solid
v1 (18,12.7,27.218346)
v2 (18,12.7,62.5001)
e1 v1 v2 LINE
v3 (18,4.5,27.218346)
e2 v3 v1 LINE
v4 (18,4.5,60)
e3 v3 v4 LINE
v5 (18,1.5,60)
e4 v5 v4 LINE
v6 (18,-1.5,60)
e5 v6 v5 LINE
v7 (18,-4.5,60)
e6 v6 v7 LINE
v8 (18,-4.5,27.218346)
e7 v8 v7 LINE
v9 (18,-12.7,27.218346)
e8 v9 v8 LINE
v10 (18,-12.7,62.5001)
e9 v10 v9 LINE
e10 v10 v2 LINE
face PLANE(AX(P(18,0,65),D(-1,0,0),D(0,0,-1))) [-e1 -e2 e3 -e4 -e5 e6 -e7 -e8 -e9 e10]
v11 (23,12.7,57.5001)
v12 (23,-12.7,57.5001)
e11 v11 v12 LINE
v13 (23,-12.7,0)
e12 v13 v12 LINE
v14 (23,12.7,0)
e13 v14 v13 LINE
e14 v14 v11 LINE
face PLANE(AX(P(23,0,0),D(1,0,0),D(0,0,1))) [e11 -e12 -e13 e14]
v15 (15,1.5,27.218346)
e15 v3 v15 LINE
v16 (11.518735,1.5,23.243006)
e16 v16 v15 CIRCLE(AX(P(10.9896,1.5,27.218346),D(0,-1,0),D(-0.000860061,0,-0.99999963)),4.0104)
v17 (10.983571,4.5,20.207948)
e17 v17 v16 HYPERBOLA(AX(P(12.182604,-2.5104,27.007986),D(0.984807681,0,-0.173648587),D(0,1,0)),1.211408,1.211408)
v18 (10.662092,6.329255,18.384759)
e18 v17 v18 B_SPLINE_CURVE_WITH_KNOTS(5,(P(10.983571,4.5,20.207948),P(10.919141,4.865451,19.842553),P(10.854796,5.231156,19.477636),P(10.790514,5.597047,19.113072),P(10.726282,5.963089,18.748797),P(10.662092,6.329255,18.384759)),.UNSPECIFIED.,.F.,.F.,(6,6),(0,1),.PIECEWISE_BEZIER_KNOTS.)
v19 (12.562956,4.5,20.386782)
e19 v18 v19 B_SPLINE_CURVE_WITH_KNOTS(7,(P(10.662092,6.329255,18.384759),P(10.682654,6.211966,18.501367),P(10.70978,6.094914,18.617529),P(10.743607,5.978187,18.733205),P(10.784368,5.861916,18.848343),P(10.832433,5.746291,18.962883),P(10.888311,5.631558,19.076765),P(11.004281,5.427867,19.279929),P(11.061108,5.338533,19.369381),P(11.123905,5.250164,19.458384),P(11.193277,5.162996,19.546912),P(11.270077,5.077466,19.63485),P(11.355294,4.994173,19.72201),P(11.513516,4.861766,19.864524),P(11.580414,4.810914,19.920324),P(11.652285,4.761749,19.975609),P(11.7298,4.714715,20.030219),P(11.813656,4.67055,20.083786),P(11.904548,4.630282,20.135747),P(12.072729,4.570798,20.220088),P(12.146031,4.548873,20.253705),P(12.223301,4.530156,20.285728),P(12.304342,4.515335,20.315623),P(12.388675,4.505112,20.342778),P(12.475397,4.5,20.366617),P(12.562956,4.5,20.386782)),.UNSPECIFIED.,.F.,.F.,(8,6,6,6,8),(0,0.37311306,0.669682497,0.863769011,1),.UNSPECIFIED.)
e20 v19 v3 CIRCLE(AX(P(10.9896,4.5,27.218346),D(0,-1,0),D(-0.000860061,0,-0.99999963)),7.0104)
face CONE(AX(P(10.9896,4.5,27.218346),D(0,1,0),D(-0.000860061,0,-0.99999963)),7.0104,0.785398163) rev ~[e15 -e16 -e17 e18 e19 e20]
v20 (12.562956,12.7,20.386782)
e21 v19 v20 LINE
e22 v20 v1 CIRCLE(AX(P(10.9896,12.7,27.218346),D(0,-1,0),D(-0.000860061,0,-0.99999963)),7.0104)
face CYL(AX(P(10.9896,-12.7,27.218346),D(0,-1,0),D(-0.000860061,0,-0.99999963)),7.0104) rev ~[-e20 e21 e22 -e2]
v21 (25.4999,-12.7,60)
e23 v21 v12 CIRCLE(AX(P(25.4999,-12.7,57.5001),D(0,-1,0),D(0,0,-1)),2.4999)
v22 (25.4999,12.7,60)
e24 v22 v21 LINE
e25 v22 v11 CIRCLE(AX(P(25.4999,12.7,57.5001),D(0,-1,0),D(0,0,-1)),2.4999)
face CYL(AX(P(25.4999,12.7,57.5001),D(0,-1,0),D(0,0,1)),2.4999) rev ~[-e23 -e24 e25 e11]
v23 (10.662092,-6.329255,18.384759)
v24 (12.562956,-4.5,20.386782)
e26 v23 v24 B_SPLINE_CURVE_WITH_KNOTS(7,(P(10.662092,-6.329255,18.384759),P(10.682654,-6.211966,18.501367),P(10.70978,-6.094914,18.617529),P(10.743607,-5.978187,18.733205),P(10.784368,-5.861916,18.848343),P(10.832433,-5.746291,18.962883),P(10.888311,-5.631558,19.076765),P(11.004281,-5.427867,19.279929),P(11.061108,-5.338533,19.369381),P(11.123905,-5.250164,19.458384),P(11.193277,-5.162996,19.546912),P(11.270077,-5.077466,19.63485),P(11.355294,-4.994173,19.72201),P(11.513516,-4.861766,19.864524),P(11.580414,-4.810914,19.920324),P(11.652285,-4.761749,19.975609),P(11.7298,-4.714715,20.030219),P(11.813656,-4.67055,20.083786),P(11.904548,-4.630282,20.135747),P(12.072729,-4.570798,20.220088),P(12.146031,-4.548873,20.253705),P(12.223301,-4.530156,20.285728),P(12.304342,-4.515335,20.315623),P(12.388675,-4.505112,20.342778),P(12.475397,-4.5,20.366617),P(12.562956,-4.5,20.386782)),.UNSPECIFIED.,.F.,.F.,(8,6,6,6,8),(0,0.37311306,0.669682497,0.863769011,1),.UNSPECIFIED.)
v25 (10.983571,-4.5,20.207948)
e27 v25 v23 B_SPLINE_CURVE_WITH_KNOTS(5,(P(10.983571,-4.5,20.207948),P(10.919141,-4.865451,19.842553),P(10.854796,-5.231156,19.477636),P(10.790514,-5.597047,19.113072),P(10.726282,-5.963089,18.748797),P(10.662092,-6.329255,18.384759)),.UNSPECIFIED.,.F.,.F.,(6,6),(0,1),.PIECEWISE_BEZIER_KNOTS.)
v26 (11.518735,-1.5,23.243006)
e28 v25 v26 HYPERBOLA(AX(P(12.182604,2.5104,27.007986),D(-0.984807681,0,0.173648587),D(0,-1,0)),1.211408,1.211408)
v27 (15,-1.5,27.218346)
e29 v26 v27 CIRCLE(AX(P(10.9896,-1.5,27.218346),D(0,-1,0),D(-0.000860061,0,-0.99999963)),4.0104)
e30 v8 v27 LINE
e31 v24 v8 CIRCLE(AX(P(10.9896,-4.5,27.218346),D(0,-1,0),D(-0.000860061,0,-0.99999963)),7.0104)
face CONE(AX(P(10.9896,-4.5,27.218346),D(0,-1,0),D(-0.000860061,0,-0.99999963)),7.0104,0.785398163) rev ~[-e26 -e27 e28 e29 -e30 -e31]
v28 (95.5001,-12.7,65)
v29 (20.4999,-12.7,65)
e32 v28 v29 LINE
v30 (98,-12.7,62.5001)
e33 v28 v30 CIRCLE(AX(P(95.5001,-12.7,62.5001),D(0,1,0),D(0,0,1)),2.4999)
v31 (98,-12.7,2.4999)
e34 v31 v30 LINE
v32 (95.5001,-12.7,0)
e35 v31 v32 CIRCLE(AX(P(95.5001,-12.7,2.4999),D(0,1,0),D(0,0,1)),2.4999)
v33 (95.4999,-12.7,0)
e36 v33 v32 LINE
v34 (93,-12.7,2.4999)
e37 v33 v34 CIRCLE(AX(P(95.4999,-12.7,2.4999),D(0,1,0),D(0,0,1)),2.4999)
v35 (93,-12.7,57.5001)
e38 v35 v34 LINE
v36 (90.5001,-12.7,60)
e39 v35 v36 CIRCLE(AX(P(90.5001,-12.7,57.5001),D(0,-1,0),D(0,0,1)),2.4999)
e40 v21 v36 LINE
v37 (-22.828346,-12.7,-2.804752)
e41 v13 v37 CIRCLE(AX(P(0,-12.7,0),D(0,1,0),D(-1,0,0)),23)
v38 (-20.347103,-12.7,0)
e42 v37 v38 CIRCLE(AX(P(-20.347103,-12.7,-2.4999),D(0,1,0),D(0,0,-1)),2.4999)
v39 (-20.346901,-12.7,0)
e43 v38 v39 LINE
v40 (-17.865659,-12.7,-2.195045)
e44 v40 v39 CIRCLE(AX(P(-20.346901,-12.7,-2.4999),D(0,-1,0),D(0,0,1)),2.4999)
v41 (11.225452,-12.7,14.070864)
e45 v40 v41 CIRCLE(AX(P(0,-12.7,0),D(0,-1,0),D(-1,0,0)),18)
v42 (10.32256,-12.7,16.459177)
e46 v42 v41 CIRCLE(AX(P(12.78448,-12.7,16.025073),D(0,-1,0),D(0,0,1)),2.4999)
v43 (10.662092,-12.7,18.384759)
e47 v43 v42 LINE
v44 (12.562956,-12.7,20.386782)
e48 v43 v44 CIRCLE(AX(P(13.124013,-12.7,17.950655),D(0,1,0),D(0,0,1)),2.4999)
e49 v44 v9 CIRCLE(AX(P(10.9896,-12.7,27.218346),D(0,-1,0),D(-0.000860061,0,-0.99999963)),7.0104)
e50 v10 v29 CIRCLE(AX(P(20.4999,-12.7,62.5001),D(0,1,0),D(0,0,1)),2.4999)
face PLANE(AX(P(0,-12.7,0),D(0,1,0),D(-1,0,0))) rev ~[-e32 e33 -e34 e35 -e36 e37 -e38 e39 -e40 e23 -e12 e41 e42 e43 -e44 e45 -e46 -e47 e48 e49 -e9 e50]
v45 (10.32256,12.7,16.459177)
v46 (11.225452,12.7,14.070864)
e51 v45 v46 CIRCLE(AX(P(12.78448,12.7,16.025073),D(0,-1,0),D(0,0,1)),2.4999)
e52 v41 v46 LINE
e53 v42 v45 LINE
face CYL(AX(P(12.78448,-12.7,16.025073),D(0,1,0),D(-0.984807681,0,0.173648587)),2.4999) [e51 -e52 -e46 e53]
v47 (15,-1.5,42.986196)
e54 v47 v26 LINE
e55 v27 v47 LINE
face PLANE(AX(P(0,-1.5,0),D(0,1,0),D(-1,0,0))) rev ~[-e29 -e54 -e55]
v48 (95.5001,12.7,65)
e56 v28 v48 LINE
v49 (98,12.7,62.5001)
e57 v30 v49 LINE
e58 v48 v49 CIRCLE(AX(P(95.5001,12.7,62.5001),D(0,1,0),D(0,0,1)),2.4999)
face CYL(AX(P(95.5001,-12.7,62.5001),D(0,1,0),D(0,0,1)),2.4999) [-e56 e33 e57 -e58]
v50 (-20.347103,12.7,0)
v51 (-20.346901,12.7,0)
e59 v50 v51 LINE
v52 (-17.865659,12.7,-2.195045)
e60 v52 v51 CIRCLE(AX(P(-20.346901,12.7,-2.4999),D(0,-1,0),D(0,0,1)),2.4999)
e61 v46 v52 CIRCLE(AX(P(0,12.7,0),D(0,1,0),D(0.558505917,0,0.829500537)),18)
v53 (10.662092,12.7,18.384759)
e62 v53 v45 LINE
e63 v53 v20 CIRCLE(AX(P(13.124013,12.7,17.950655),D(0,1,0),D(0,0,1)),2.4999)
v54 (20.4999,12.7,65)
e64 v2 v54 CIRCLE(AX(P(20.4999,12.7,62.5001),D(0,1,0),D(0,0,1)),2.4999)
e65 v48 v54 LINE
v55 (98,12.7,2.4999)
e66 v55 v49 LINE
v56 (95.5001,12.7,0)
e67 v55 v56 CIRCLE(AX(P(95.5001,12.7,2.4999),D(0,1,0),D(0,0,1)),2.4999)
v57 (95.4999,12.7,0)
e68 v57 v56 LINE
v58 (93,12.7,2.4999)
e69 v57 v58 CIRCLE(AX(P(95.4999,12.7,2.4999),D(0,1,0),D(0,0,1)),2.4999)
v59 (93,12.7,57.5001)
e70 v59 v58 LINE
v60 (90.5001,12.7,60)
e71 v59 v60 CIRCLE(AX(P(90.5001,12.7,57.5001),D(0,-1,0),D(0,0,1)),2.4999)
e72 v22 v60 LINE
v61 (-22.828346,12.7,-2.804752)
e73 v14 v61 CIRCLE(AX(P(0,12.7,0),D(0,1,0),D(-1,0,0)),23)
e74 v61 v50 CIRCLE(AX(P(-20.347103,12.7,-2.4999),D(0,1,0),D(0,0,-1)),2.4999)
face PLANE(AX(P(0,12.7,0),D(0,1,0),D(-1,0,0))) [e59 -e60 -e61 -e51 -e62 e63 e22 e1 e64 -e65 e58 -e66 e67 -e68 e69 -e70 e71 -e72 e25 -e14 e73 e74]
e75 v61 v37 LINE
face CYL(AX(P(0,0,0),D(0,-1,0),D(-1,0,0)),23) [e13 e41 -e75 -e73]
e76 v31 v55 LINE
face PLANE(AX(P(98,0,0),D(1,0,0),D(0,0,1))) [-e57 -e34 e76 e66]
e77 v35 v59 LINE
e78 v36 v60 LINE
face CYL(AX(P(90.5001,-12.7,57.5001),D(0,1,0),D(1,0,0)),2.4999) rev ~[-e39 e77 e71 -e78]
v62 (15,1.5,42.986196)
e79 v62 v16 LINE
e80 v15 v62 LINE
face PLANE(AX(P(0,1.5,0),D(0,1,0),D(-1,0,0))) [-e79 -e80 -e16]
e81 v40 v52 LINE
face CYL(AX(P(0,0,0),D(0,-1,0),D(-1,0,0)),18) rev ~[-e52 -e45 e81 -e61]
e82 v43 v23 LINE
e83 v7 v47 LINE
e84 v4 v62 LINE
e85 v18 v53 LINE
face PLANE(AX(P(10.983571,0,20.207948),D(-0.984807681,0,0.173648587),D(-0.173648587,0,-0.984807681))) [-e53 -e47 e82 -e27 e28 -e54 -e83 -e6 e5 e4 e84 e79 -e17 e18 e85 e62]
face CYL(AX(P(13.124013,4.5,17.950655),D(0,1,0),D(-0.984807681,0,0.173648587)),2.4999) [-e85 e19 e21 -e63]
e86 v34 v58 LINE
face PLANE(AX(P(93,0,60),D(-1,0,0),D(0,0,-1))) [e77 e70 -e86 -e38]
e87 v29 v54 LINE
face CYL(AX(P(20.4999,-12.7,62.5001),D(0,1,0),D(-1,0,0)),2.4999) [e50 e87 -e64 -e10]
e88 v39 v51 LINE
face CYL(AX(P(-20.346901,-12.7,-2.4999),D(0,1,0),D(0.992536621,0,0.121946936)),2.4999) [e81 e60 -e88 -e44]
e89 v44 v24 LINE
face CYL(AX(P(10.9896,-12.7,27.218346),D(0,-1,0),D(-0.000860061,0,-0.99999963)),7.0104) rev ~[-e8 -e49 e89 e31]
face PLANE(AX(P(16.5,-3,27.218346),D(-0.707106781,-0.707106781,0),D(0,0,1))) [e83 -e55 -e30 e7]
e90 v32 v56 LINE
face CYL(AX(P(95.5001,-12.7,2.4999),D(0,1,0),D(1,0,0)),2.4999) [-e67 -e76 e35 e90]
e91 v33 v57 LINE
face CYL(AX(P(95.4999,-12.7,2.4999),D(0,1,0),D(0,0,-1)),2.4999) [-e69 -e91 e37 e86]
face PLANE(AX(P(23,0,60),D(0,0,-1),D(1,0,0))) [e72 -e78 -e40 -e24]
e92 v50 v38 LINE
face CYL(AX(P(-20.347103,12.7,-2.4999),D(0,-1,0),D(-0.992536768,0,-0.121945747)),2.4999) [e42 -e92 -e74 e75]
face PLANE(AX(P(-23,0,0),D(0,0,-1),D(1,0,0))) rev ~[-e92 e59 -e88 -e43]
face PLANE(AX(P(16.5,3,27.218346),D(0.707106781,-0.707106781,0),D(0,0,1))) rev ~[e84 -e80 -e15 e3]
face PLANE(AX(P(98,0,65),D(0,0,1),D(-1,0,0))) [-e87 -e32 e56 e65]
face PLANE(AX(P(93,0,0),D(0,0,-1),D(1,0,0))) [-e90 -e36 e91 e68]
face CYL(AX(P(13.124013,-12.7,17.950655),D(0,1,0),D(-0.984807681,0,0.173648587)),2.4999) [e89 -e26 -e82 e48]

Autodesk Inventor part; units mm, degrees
ref_plane "YZ Plane" through (0, 0, 0) normal (1, 0, 0) x (0, 1, 0)
ref_plane "XZ Plane" through (0, 0, 0) normal (0, 1, 0) x (-1, 0, 0)
ref_plane "XY Plane" through (0, 0, 0) normal (0, 0, 1) x (1, 0, 0)
sketch "Sketch1" plane through (0, 0, 0) normal (0, 1, 0) x (-1, 0, 0)
  circle A0 centre (0, 0) radius 18
  circle A1 centre (0, 0) radius 23
  line L0 (-98, 65) -> (-18, 65)
  line L1 (-18, 65) -> (-18, 0)
  line L2 (-98, 0) -> (-98, 65)
  line L3 (-23, 60) -> (-93, 60)
  line L4 (-93, 60) -> (-93, 0)
  line L5 (-23, 0) -> (-23, 60)
  line L6 (-93, 0) -> (-98, 0)
  line L7 (-18, 60) -> (-10.0531, 14.931)
  line L8 (23, 0) -> (-23, 0)
  point P0 (18, 0)
  point P1 (-10.9836, 20.2079)
  point P2 (-18, 14.3178)
  dimension "d0" = 36
  dimension "d1" = 5
  dimension "d10" = 5
  dimension "d11" = 5
  dimension "d13" = 60
  dimension "d14" = 70
  dimension "d15" = 10
extrude "Extrusion1" add sketch "Sketch1" along normal mid plane 25.4 contours L8 A1 A0 | A0 L1 A1 L7 | L8 A1 L1 | A1 L5 L3 L4 L6 L2 L0 L1
fillet "Fillet1" radius 7.0104 1 edges at (18, 0, 14.3178)
extrude "Extrusion2" add sketch "Sketch1" along normal mid plane 3 contours A1 L1 L7
chamfer "Chamfer1" distance 3 angle 45 4 edges at (15.9446, 1.5, 22.2591) (18, 1.5, 43.6092) (15.9446, -1.5, 22.2591) (18, -1.5, 43.6092)
fillet "Fillet2" radius 2.5 11 edges at (18, 0, 65) (98, 0, 65) (98, 0, 0) (93, 0, 0) (23, 0, 60) (93, 0, 60) (-18, 0, 0) (-23, 0, 0) (10.0531, 0, 14.931) (10.9836, 8.6, 20.2079) (10.9836, -8.6, 20.2079)
equation "\"d10\" = d1"
equation "\"d11\" = d1"
properties part number "Clip"
